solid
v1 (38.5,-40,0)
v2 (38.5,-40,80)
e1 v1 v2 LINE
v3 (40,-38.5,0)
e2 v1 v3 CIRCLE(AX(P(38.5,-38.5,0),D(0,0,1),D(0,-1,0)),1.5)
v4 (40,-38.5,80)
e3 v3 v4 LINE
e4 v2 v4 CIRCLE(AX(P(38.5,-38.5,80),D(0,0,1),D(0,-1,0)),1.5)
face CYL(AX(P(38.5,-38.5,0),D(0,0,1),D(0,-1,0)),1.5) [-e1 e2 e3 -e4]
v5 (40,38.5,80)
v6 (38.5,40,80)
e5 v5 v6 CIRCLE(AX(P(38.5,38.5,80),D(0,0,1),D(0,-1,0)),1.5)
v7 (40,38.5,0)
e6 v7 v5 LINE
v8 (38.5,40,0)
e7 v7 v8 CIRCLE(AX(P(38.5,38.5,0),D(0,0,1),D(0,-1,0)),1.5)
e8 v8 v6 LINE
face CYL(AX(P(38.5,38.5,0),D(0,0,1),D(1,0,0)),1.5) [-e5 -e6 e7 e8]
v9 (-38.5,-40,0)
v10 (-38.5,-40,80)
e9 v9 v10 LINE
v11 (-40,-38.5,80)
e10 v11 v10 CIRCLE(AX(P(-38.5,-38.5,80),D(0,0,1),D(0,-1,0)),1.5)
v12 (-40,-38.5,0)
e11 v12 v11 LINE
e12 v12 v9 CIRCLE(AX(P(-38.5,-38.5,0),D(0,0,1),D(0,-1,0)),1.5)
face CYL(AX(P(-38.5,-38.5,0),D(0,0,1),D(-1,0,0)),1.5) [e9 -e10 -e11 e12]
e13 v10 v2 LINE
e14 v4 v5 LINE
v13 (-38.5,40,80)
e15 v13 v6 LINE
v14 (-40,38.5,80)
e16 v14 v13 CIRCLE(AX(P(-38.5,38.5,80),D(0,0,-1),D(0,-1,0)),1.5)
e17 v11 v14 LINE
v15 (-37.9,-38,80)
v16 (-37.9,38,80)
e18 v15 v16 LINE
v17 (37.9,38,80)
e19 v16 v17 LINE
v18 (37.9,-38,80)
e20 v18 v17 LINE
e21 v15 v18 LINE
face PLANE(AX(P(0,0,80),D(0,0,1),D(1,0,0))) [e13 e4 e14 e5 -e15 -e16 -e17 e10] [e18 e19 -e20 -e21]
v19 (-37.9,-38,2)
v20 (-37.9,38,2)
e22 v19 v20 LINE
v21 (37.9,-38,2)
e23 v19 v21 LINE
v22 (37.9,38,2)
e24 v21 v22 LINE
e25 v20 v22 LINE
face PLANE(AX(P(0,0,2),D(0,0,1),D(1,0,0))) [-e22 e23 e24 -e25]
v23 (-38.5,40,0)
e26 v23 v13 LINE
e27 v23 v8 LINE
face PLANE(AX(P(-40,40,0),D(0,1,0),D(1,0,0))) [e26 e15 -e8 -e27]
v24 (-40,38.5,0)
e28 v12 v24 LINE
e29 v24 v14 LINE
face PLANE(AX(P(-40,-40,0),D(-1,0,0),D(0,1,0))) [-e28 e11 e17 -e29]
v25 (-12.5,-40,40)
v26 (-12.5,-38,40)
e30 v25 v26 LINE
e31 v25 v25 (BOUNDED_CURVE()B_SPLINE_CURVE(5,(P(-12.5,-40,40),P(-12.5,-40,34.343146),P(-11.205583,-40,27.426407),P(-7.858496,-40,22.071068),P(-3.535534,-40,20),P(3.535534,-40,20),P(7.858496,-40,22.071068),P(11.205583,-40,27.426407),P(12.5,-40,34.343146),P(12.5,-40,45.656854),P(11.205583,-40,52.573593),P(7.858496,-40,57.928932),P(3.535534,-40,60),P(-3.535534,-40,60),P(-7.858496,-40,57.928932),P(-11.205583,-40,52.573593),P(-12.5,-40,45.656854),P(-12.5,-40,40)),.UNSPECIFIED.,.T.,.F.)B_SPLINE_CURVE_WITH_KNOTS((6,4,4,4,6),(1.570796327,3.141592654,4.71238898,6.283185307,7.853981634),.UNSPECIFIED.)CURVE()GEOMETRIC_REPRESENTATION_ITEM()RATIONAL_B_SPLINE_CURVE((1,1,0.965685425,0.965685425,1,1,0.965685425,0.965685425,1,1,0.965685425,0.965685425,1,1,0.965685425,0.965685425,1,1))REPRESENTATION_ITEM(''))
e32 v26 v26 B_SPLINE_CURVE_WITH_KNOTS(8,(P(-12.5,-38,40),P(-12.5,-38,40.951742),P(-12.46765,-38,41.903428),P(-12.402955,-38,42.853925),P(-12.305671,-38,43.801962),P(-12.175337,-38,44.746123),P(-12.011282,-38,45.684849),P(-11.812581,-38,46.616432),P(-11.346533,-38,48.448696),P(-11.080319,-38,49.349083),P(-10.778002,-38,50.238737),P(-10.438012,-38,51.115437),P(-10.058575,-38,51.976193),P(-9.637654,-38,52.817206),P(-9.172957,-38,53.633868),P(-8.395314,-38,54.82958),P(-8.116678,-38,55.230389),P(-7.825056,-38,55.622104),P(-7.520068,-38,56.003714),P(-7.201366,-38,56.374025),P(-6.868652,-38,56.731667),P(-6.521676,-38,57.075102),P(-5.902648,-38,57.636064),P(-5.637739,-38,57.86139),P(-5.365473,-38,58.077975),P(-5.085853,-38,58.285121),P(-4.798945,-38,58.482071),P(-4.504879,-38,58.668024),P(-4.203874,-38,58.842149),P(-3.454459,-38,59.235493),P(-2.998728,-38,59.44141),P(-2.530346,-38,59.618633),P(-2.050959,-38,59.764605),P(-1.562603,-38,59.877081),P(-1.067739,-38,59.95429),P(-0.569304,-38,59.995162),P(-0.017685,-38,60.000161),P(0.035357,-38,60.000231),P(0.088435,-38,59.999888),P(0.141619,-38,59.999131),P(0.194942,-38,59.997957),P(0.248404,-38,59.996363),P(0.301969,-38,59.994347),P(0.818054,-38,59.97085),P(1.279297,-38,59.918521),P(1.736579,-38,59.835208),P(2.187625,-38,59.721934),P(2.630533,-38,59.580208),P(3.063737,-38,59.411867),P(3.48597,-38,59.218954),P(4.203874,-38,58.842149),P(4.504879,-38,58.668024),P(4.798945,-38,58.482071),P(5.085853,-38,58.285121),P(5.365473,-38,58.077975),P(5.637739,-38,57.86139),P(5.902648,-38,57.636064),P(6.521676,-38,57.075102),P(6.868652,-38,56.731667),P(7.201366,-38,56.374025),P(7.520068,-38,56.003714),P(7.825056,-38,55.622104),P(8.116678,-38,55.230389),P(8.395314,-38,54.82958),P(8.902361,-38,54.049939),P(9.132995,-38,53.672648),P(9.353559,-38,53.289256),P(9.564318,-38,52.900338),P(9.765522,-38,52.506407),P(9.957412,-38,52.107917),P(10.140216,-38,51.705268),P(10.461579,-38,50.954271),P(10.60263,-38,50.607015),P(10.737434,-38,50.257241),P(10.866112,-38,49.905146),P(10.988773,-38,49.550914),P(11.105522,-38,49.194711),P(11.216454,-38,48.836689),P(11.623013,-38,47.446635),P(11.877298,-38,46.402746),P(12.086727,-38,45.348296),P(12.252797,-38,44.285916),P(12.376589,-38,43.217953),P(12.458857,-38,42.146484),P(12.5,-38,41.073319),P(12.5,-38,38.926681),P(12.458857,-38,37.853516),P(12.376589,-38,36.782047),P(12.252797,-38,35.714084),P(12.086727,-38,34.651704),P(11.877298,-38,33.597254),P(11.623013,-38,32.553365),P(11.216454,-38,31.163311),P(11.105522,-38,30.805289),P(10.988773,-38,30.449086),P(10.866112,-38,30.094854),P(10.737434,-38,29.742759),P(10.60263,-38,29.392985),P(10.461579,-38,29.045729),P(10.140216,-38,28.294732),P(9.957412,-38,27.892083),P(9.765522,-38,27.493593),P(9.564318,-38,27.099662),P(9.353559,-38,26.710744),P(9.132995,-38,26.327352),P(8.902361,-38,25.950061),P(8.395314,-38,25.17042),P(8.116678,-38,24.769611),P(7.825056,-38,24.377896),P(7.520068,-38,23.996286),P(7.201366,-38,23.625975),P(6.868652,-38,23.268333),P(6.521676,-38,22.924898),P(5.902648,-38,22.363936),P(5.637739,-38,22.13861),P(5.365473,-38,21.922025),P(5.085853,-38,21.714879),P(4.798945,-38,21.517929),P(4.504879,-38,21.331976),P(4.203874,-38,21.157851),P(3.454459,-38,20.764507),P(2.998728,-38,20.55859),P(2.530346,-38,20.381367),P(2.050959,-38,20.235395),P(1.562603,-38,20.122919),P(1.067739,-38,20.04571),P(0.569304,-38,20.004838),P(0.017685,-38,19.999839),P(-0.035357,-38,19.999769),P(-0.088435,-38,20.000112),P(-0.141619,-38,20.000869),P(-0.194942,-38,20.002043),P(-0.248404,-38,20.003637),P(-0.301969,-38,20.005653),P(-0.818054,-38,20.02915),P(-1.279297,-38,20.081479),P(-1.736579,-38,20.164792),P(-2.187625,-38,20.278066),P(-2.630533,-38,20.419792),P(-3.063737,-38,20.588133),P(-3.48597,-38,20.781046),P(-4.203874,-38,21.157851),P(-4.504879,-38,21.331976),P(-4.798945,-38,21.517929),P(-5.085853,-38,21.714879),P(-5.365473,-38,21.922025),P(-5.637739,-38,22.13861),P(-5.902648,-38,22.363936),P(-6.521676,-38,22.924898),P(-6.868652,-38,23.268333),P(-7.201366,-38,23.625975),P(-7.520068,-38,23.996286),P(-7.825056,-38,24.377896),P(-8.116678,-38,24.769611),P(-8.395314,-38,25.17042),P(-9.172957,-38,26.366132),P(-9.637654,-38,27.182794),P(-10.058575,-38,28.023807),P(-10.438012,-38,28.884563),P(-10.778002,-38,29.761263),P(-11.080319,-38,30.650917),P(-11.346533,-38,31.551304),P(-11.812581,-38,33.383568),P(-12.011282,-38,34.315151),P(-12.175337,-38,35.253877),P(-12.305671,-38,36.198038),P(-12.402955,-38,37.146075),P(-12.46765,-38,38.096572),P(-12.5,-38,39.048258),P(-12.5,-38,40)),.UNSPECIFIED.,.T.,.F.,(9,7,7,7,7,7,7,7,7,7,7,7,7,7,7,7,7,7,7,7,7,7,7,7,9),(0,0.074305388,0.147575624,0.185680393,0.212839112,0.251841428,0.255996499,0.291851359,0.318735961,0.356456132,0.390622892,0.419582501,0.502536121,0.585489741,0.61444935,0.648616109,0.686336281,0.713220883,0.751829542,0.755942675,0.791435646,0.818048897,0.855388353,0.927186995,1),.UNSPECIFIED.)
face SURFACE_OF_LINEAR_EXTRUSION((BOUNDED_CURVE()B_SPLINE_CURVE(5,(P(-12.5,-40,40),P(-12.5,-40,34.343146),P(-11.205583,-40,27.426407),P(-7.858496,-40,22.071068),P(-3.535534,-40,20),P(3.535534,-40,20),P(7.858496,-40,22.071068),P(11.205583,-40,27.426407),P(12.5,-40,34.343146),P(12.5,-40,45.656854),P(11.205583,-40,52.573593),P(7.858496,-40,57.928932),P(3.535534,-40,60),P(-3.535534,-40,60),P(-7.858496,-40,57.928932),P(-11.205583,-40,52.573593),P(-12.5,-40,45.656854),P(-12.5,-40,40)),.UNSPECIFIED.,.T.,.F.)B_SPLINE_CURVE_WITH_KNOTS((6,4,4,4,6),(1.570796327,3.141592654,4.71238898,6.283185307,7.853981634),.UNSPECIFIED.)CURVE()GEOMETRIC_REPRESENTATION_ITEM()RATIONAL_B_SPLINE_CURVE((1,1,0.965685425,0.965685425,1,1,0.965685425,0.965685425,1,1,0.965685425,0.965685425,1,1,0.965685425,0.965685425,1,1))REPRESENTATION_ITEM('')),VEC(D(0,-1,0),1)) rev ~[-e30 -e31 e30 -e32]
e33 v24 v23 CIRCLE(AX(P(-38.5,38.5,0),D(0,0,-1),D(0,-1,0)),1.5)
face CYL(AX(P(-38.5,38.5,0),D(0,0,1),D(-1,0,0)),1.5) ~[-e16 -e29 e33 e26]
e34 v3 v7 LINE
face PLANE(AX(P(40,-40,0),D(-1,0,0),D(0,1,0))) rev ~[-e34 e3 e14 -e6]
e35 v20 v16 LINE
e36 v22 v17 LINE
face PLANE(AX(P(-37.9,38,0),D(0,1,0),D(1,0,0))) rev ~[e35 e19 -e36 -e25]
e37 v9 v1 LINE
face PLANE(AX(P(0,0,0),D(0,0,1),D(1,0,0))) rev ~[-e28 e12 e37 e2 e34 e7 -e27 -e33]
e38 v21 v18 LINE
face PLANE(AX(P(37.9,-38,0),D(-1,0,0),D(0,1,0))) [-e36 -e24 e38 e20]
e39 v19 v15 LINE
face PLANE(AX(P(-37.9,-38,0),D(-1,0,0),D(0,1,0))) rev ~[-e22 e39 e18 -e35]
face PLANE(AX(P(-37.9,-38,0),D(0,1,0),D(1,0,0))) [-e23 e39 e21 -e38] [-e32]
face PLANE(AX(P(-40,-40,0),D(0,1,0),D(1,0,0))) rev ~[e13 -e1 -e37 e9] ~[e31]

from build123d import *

# Parameters (mm, degrees)
F0_W     = 80
F0_H     = 80
F0_W_2   = 75.8
F0_H_2   = 76
F1_DEPTH = 80
F2_DEPTH = 2
F4_DEPTH = 25
F5_R     = 1.5


with BuildPart() as f1:
    # F0 (on Top) → F1 (new body)
    with BuildSketch(Plane.XY):
        Rectangle(F0_W, F0_H)
        Rectangle(F0_W_2, F0_H_2, mode=Mode.SUBTRACT)
    extrude(amount=F1_DEPTH)

    # F0 (on Top) → F2 (join)
    with BuildSketch(Plane.XY):
        Rectangle(F0_W_2, F0_H_2)
    extrude(amount=F2_DEPTH)

    # F3 (on face) → F4 (cut)
    with BuildSketch(Plane.XZ.offset(40)):
        with BuildLine():
            Line((0, 40), (0, 60))
            add(Edge.make_bspline(
                [(0, 60), (-12.5, 60), (-12.5, 40)],
                knots=[0, 0, 0, 1.5707963268, 1.5707963268, 1.5707963268], degree=2, weights=[1, 0.7071067812, 1]))
            Line((-12.5, 40), (0, 40))
        make_face()
        with BuildLine():
            add(Edge.make_bspline(
                [(12.5, 40), (12.5, 60), (0, 60)],
                knots=[4.7123889804, 4.7123889804, 4.7123889804, 6.2831853072, 6.2831853072, 6.2831853072], degree=2, weights=[1, 0.7071067812, 1]))
            Line((0, 60), (0, 40))
            Line((0, 40), (12.5, 40))
        make_face()
        with BuildLine():
            Line((12.5, 40), (0, 40))
            Line((0, 40), (0, 20))
            add(Edge.make_bspline(
                [(0, 20), (12.5, 20), (12.5, 40)],
                knots=[3.1415926536, 3.1415926536, 3.1415926536, 4.7123889804, 4.7123889804, 4.7123889804], degree=2, weights=[1, 0.7071067812, 1]))
        make_face()
        with BuildLine():
            Line((0, 20), (0, 40))
            Line((0, 40), (-12.5, 40))
            add(Edge.make_bspline(
                [(-12.5, 40), (-12.5, 20), (0, 20)],
                knots=[1.5707963268, 1.5707963268, 1.5707963268, 3.1415926536, 3.1415926536, 3.1415926536], degree=2, weights=[1, 0.7071067812, 1]))
        make_face()
    extrude(amount=-F4_DEPTH, mode=Mode.SUBTRACT)

    # F5
    f5_edges = [f1.edges().sort_by_distance(p)[0] for p in [
        (-40, -40, 40),
        (40, 40, 40),
        (-40, 40, 40),
        (40, -40, 40),
    ]]
    fillet(f5_edges, radius=F5_R)


solid = f1.part
